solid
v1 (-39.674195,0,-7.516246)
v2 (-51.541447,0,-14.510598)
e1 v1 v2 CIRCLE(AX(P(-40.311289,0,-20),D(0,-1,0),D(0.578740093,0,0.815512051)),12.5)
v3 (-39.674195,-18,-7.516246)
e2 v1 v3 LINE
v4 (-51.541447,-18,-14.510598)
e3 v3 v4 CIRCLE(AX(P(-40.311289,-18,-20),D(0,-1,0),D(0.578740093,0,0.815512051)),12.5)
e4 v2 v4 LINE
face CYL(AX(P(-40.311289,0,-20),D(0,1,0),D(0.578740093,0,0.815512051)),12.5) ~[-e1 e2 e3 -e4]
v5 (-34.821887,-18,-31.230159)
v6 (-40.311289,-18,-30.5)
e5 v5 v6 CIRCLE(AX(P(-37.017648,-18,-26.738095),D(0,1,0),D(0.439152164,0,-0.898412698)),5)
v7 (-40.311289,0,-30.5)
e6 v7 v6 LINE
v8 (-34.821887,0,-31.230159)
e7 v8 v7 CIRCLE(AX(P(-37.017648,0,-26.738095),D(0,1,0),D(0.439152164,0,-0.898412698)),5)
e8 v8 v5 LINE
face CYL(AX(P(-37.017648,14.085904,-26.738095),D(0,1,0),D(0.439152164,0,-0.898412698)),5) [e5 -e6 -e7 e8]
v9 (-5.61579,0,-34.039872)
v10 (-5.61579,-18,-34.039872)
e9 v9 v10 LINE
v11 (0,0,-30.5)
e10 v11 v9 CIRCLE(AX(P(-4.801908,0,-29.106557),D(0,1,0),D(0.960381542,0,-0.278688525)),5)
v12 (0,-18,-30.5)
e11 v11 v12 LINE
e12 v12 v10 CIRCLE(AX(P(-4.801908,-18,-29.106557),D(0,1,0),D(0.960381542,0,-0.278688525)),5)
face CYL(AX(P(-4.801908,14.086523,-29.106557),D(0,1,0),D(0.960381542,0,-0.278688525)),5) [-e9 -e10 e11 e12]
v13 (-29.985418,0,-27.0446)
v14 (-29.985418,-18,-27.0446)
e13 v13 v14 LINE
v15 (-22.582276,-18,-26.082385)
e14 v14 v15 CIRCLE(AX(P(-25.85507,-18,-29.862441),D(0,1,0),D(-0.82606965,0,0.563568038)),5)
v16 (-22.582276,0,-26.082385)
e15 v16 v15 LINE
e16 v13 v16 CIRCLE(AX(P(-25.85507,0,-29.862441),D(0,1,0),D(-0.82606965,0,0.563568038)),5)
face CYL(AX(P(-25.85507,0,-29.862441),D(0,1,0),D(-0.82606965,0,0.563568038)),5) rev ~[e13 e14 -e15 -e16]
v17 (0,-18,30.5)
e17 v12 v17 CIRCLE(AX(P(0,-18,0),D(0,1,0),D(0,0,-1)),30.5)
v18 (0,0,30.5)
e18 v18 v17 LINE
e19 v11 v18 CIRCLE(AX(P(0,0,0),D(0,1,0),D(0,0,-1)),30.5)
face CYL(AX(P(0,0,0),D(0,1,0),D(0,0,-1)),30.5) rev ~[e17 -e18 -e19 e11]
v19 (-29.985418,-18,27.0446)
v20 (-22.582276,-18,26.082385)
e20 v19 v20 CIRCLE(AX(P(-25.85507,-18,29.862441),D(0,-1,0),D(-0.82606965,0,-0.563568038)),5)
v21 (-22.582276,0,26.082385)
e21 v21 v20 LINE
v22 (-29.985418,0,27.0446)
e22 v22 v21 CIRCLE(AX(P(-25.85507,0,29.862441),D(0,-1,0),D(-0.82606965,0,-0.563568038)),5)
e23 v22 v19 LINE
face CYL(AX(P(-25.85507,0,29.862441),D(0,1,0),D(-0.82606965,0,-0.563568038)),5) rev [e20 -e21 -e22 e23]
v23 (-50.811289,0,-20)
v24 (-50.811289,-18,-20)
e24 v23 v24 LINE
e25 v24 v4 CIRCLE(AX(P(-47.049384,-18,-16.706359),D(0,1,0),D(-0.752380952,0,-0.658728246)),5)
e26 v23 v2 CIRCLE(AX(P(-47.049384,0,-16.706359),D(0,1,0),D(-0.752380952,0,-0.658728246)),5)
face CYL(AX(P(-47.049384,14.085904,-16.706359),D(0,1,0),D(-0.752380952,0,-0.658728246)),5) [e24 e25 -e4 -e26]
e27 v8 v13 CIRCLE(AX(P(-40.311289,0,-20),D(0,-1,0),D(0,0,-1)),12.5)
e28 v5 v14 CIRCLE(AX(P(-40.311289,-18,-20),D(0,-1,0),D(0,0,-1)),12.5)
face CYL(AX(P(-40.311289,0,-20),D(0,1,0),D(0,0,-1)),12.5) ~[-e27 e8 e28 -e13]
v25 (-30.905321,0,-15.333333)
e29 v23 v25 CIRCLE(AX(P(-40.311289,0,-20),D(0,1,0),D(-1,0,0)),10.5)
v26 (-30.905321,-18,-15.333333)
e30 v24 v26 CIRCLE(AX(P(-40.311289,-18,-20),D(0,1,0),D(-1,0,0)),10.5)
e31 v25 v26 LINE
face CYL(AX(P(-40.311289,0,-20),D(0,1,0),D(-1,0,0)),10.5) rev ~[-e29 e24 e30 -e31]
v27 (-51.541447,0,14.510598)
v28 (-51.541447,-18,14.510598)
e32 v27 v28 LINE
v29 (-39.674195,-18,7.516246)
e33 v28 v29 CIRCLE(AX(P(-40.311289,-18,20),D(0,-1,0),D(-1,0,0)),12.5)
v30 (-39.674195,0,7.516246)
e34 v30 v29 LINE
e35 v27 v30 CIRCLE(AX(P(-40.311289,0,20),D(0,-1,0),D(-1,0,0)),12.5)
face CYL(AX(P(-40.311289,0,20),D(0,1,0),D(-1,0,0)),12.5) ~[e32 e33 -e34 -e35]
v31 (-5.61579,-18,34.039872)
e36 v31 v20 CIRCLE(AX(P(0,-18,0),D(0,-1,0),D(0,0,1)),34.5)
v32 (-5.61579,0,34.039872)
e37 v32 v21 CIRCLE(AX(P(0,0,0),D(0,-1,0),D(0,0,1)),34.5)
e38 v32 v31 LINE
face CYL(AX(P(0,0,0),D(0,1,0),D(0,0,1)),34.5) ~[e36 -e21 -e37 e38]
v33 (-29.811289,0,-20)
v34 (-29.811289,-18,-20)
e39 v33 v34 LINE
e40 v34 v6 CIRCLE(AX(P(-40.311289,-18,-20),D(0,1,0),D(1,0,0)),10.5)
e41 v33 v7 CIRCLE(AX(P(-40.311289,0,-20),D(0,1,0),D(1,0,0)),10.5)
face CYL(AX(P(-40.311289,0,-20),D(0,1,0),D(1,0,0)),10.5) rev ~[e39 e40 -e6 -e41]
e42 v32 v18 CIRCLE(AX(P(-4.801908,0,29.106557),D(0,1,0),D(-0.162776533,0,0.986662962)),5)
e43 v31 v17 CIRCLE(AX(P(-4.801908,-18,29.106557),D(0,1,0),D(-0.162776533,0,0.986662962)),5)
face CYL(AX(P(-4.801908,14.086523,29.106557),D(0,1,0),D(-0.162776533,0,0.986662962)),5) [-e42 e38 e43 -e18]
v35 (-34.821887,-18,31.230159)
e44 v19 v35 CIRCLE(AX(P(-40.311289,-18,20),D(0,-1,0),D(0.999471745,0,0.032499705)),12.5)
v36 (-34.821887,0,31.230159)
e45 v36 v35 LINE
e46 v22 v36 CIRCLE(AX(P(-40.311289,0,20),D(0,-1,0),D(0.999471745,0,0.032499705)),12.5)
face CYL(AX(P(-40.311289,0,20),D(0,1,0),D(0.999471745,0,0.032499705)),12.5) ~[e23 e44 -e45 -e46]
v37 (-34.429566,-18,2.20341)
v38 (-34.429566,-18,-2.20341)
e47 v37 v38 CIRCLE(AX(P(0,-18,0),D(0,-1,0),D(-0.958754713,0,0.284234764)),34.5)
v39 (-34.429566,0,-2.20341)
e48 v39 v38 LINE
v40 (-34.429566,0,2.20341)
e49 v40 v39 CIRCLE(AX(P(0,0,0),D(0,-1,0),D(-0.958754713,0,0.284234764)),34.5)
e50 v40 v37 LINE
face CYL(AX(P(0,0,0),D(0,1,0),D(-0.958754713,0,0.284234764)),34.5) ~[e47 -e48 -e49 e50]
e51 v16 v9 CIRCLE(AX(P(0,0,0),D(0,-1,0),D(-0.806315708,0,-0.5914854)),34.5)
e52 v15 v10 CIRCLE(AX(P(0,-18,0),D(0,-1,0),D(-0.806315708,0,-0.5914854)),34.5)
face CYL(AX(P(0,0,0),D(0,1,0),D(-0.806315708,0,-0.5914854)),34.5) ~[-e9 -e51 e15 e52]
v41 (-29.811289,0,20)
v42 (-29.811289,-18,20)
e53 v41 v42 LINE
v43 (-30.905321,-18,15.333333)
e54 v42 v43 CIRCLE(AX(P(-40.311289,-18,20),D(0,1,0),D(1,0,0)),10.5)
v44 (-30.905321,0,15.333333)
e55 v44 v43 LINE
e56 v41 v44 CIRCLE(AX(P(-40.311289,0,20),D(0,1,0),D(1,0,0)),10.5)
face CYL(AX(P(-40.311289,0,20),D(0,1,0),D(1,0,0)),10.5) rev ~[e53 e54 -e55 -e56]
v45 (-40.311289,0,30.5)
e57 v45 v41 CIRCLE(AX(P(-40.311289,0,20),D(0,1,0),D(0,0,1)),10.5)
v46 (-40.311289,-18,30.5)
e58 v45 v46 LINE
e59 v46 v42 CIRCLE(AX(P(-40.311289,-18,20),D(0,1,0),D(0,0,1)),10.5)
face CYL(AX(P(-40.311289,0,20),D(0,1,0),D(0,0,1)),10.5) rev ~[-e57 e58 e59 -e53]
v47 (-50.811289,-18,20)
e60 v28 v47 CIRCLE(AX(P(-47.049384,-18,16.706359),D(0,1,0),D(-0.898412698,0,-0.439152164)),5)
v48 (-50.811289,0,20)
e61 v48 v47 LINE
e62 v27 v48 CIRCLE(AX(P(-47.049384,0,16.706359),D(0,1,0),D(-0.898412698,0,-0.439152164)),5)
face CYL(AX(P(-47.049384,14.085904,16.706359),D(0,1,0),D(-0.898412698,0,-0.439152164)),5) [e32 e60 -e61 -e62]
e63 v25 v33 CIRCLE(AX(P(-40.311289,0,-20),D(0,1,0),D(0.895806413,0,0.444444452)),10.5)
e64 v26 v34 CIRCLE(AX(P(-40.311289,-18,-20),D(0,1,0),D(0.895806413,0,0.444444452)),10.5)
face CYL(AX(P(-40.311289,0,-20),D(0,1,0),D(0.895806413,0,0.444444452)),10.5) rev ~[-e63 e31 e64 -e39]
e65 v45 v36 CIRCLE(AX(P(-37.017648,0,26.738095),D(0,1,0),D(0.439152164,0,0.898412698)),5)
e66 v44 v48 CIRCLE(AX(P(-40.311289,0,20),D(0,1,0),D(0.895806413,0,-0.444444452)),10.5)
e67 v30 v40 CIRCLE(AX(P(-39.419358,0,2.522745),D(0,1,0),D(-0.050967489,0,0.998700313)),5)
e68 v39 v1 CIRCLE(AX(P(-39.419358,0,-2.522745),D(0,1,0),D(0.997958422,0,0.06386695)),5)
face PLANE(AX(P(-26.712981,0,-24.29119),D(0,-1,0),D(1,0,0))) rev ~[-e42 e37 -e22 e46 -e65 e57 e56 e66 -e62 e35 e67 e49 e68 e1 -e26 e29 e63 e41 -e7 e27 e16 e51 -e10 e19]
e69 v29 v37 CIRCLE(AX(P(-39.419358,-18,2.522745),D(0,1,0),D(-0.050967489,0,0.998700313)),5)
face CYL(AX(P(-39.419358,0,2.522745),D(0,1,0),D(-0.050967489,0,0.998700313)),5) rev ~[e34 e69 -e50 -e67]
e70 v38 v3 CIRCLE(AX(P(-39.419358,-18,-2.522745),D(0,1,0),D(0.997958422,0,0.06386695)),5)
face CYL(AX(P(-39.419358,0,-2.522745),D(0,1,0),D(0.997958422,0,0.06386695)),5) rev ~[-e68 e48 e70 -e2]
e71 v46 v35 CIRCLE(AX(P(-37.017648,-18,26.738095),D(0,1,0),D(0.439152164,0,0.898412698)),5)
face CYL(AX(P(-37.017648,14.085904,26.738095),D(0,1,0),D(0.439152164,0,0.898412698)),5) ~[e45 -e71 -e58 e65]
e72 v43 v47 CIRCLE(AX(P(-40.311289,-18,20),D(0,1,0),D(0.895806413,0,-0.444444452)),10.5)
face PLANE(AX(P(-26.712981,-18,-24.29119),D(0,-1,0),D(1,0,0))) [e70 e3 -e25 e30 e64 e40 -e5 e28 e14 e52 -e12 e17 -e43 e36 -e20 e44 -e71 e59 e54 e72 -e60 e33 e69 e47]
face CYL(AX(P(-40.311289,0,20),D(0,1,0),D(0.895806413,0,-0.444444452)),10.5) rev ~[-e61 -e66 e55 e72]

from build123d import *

# Parameters (mm, degrees)
F1_DEPTH     = 18
F2_T1_DEPTH  = 18
F2_T3_DEPTH  = 18
F2_T5_DEPTH  = 18
F2_T7_DEPTH  = 18
F2_T9_DEPTH  = 46.171808491
F2_T11_DEPTH = 46.171808491
F2_T13_DEPTH = 46.171808491
F2_T15_DEPTH = 46.171808491
F2_T17_DEPTH = 46.1730452367
F2_T19_DEPTH = 46.1730452367


# Not quite as in the source:
# - a fillet or chamfer that OpenCascade refuses, or shapes differently, is made with other operations: its cross-section is extruded or revolved along the edge and cut away or added


with BuildPart() as f1:
    # F0 (on Front) → F1 (new body)
    with BuildSketch(Plane.XZ):
        with BuildLine():
            ThreePointArc((-30.9053214059, 15.3333332579), (-29.4709612635, 17.9363441706), (-27.8178919283, 20.4062463149))
            ThreePointArc((-27.8178919283, 20.4062463149), (-31.6172700774, 28.9813161323), (-40.3112887415, 32.5))
            Line((-40.3112887415, 32.5), (-40.3112887415, 30.5))
            ThreePointArc((-40.3112887415, 30.5), (-32.886667539, 27.4246212025), (-29.8112887415, 20))
            ThreePointArc((-29.8112887415, 20), (-30.0884550584, 17.6034041876), (-30.9053214059, 15.3333332579))
        make_face()
        with BuildLine():
            ThreePointArc((0, -30.5), (-30.5, 0), (0, 30.5))
            Line((0, 30.5), (0, 34.5))
            ThreePointArc((0, 34.5), (-15.5922176443, 30.7755219116), (-27.8178919283, 20.4062463149))
            ThreePointArc((-27.8178919283, 20.4062463149), (-27.8129396472, 20.203149988), (-27.8112887415, 20))
            ThreePointArc((-27.8112887415, 20), (-29.205476311, 14.2631951176), (-33.0770375829, 9.8060993641))
            ThreePointArc((-33.0770375829, 9.8060993641), (-34.5, 0), (-33.0770375829, -9.8060993641))
            ThreePointArc((-33.0770375829, -9.8060993641), (-29.205476311, -14.2631951176), (-27.8112887415, -20))
            ThreePointArc((-27.8112887415, -20), (-27.8129396472, -20.203149988), (-27.8178919283, -20.4062463149))
            ThreePointArc((-27.8178919283, -20.4062463149), (-15.5922176443, -30.7755219116), (0, -34.5))
            Line((0, -34.5), (0, -30.5))
        make_face()
        with BuildLine():
            ThreePointArc((-27.8112887415, 20), (-27.8129396472, 20.203149988), (-27.8178919283, 20.4062463149))
            ThreePointArc((-27.8178919283, 20.4062463149), (-29.4709612635, 17.9363441706), (-30.9053214059, 15.3333332579))
            ThreePointArc((-30.9053214059, 15.3333332579), (-32.1103276855, 12.6165310576), (-33.0770375829, 9.8060993641))
            ThreePointArc((-33.0770375829, 9.8060993641), (-29.205476311, 14.2631951176), (-27.8112887415, 20))
        make_face()
        with BuildLine():
            ThreePointArc((-30.905321409, -15.3333332517), (-29.4709612653, -17.9363441676), (-27.8178919283, -20.4062463149))
            ThreePointArc((-27.8178919283, -20.4062463149), (-27.8129396472, -20.203149988), (-27.8112887415, -20))
            ThreePointArc((-27.8112887415, -20), (-29.205476311, -14.2631951176), (-33.0770375829, -9.8060993641))
            ThreePointArc((-33.0770375829, -9.8060993641), (-32.1103276868, -12.6165310544), (-30.905321409, -15.3333332517))
        make_face()
        with BuildLine():
            ThreePointArc((-33.0770375829, 9.8060993641), (-32.1103276855, 12.6165310576), (-30.9053214059, 15.3333332579))
            ThreePointArc((-30.9053214059, 15.3333332579), (-42.7078845539, 9.7771663169), (-50.8112887415, 20))
            Line((-50.8112887415, 20), (-52.8112887415, 20))
            ThreePointArc((-52.8112887415, 20), (-46.0480936239, 8.8941875695), (-33.0770375829, 9.8060993641))
        make_face()
        with BuildLine():
            ThreePointArc((-50.8112887415, -20), (-42.7078845573, -9.7771663177), (-30.905321409, -15.3333332517))
            ThreePointArc((-30.905321409, -15.3333332517), (-32.1103276868, -12.6165310544), (-33.0770375829, -9.8060993641))
            ThreePointArc((-33.0770375829, -9.8060993641), (-46.0480936239, -8.8941875695), (-52.8112887415, -20))
            Line((-52.8112887415, -20), (-50.8112887415, -20))
        make_face()
        with BuildLine():
            ThreePointArc((-40.3112887415, -32.5), (-31.6172700774, -28.9813161323), (-27.8178919283, -20.4062463149))
            ThreePointArc((-27.8178919283, -20.4062463149), (-29.4709612653, -17.9363441676), (-30.905321409, -15.3333332517))
            ThreePointArc((-30.905321409, -15.3333332517), (-30.0884550592, -17.6034041842), (-29.8112887415, -20))
            ThreePointArc((-29.8112887415, -20), (-32.886667539, -27.4246212025), (-40.3112887415, -30.5))
            Line((-40.3112887415, -30.5), (-40.3112887415, -32.5))
        make_face()
    extrude(amount=F1_DEPTH)

    # F2: fillet of radius 5 on 10 edges, made by hand

    # F2_s2 → F2_t1 (join)
    with BuildSketch(Plane.XZ):
        with BuildLine():
            ThreePointArc((-29.9854181156, 27.0446004725), (-26.4995189962, 24.9041460638), (-22.5822762114, 26.0823848816))
            ThreePointArc((-22.5822762114, 26.0823848816), (-25.3593942038, 23.3912617363), (-27.8178919283, 20.4062463149))
            ThreePointArc((-27.8178919283, 20.4062463149), (-28.4286678987, 23.8798610678), (-29.9854181156, 27.0446004725))
        make_face()
    extrude(amount=F2_T1_DEPTH)

    # F2_s4 → F2_t3 (join)
    with BuildSketch(Plane.XZ):
        with BuildLine():
            ThreePointArc((-39.6741951276, 7.5162460883), (-35.861056634, 6.0353637247), (-34.4295655704, 2.2034097738))
            ThreePointArc((-34.4295655704, 2.2034097738), (-33.9666835234, 6.0427154842), (-33.0770375829, 9.8060993641))
            ThreePointArc((-33.0770375829, 9.8060993641), (-36.2124627952, 8.1911208888), (-39.6741951276, 7.5162460883))
        make_face()
    extrude(amount=F2_T3_DEPTH)

    # F2_s6 → F2_t5 (join)
    with BuildSketch(Plane.XZ):
        with BuildLine():
            ThreePointArc((-34.4295655704, -2.2034097738), (-35.861056634, -6.0353637247), (-39.6741951276, -7.5162460883))
            ThreePointArc((-39.6741951276, -7.5162460883), (-36.2124627952, -8.1911208888), (-33.0770375829, -9.8060993641))
            ThreePointArc((-33.0770375829, -9.8060993641), (-33.9666835234, -6.0427154842), (-34.4295655704, -2.2034097738))
        make_face()
    extrude(amount=F2_T5_DEPTH)

    # F2_s8 → F2_t7 (join)
    with BuildSketch(Plane.XZ):
        with BuildLine():
            ThreePointArc((-29.9854181156, -27.0446004725), (-26.4995189962, -24.9041460638), (-22.5822762114, -26.0823848816))
            ThreePointArc((-22.5822762114, -26.0823848816), (-25.3593942038, -23.3912617363), (-27.8178919283, -20.4062463149))
            ThreePointArc((-27.8178919283, -20.4062463149), (-28.4286678987, -23.8798610678), (-29.9854181156, -27.0446004725))
        make_face()
    extrude(amount=F2_T7_DEPTH)

    # F2_s10 → F2_t9 (cut)
    with BuildSketch(Plane.XZ.offset(-14.0859042455)):
        with BuildLine():
            ThreePointArc((-34.8218866889, 31.2301587302), (-37.676903372, 31.6944428559), (-40.3112887415, 30.5))
            Line((-40.3112887415, 30.5), (-40.3112887415, 32.5))
            ThreePointArc((-40.3112887415, 32.5), (-37.4941078924, 32.1784026893), (-34.8218866889, 31.2301587302))
        make_face()
    extrude(amount=F2_T9_DEPTH, mode=Mode.SUBTRACT)

    # F2_s12 → F2_t11 (cut)
    with BuildSketch(Plane.XZ.offset(-14.0859042455)):
        with BuildLine():
            ThreePointArc((-51.5414474717, 14.5105979474), (-52.0057315974, 17.3656146306), (-50.8112887415, 20))
            Line((-50.8112887415, 20), (-52.8112887415, 20))
            ThreePointArc((-52.8112887415, 20), (-52.4896914308, 17.1828191509), (-51.5414474717, 14.5105979474))
        make_face()
    extrude(amount=F2_T11_DEPTH, mode=Mode.SUBTRACT)

    # F2_s14 → F2_t13 (cut)
    with BuildSketch(Plane.XZ.offset(-14.0859042455)):
        with BuildLine():
            ThreePointArc((-50.8112887415, -20), (-52.0057315974, -17.3656146306), (-51.5414474717, -14.5105979474))
            ThreePointArc((-51.5414474717, -14.5105979474), (-52.4896914308, -17.1828191509), (-52.8112887415, -20))
            Line((-52.8112887415, -20), (-50.8112887415, -20))
        make_face()
    extrude(amount=F2_T13_DEPTH, mode=Mode.SUBTRACT)

    # F2_s16 → F2_t15 (cut)
    with BuildSketch(Plane.XZ.offset(-14.0859042455)):
        with BuildLine():
            ThreePointArc((-34.8218866889, -31.2301587302), (-37.676903372, -31.6944428559), (-40.3112887415, -30.5))
            Line((-40.3112887415, -30.5), (-40.3112887415, -32.5))
            ThreePointArc((-40.3112887415, -32.5), (-37.4941078924, -32.1784026893), (-34.8218866889, -31.2301587302))
        make_face()
    extrude(amount=F2_T15_DEPTH, mode=Mode.SUBTRACT)

    # F2_s18 → F2_t17 (cut)
    with BuildSketch(Plane.XZ.offset(-14.0865226184)):
        with BuildLine():
            ThreePointArc((0, -30.5), (-2.1356819659, -33.3363611882), (-5.6157903729, -34.0398721867))
            ThreePointArc((-5.6157903729, -34.0398721867), (-2.8173045237, -34.3847756314), (0, -34.5))
            Line((0, -34.5), (0, -30.5))
        make_face()
    extrude(amount=F2_T17_DEPTH, mode=Mode.SUBTRACT)

    # F2_s20 → F2_t19 (cut)
    with BuildSketch(Plane.XZ.offset(-14.0865226184)):
        with BuildLine():
            ThreePointArc((-5.6157903729, 34.0398721867), (-2.1356819659, 33.3363611882), (0, 30.5))
            Line((0, 30.5), (0, 34.5))
            ThreePointArc((0, 34.5), (-2.8173045237, 34.3847756314), (-5.6157903729, 34.0398721867))
        make_face()
    extrude(amount=F2_T19_DEPTH, mode=Mode.SUBTRACT)


solid = f1.part
